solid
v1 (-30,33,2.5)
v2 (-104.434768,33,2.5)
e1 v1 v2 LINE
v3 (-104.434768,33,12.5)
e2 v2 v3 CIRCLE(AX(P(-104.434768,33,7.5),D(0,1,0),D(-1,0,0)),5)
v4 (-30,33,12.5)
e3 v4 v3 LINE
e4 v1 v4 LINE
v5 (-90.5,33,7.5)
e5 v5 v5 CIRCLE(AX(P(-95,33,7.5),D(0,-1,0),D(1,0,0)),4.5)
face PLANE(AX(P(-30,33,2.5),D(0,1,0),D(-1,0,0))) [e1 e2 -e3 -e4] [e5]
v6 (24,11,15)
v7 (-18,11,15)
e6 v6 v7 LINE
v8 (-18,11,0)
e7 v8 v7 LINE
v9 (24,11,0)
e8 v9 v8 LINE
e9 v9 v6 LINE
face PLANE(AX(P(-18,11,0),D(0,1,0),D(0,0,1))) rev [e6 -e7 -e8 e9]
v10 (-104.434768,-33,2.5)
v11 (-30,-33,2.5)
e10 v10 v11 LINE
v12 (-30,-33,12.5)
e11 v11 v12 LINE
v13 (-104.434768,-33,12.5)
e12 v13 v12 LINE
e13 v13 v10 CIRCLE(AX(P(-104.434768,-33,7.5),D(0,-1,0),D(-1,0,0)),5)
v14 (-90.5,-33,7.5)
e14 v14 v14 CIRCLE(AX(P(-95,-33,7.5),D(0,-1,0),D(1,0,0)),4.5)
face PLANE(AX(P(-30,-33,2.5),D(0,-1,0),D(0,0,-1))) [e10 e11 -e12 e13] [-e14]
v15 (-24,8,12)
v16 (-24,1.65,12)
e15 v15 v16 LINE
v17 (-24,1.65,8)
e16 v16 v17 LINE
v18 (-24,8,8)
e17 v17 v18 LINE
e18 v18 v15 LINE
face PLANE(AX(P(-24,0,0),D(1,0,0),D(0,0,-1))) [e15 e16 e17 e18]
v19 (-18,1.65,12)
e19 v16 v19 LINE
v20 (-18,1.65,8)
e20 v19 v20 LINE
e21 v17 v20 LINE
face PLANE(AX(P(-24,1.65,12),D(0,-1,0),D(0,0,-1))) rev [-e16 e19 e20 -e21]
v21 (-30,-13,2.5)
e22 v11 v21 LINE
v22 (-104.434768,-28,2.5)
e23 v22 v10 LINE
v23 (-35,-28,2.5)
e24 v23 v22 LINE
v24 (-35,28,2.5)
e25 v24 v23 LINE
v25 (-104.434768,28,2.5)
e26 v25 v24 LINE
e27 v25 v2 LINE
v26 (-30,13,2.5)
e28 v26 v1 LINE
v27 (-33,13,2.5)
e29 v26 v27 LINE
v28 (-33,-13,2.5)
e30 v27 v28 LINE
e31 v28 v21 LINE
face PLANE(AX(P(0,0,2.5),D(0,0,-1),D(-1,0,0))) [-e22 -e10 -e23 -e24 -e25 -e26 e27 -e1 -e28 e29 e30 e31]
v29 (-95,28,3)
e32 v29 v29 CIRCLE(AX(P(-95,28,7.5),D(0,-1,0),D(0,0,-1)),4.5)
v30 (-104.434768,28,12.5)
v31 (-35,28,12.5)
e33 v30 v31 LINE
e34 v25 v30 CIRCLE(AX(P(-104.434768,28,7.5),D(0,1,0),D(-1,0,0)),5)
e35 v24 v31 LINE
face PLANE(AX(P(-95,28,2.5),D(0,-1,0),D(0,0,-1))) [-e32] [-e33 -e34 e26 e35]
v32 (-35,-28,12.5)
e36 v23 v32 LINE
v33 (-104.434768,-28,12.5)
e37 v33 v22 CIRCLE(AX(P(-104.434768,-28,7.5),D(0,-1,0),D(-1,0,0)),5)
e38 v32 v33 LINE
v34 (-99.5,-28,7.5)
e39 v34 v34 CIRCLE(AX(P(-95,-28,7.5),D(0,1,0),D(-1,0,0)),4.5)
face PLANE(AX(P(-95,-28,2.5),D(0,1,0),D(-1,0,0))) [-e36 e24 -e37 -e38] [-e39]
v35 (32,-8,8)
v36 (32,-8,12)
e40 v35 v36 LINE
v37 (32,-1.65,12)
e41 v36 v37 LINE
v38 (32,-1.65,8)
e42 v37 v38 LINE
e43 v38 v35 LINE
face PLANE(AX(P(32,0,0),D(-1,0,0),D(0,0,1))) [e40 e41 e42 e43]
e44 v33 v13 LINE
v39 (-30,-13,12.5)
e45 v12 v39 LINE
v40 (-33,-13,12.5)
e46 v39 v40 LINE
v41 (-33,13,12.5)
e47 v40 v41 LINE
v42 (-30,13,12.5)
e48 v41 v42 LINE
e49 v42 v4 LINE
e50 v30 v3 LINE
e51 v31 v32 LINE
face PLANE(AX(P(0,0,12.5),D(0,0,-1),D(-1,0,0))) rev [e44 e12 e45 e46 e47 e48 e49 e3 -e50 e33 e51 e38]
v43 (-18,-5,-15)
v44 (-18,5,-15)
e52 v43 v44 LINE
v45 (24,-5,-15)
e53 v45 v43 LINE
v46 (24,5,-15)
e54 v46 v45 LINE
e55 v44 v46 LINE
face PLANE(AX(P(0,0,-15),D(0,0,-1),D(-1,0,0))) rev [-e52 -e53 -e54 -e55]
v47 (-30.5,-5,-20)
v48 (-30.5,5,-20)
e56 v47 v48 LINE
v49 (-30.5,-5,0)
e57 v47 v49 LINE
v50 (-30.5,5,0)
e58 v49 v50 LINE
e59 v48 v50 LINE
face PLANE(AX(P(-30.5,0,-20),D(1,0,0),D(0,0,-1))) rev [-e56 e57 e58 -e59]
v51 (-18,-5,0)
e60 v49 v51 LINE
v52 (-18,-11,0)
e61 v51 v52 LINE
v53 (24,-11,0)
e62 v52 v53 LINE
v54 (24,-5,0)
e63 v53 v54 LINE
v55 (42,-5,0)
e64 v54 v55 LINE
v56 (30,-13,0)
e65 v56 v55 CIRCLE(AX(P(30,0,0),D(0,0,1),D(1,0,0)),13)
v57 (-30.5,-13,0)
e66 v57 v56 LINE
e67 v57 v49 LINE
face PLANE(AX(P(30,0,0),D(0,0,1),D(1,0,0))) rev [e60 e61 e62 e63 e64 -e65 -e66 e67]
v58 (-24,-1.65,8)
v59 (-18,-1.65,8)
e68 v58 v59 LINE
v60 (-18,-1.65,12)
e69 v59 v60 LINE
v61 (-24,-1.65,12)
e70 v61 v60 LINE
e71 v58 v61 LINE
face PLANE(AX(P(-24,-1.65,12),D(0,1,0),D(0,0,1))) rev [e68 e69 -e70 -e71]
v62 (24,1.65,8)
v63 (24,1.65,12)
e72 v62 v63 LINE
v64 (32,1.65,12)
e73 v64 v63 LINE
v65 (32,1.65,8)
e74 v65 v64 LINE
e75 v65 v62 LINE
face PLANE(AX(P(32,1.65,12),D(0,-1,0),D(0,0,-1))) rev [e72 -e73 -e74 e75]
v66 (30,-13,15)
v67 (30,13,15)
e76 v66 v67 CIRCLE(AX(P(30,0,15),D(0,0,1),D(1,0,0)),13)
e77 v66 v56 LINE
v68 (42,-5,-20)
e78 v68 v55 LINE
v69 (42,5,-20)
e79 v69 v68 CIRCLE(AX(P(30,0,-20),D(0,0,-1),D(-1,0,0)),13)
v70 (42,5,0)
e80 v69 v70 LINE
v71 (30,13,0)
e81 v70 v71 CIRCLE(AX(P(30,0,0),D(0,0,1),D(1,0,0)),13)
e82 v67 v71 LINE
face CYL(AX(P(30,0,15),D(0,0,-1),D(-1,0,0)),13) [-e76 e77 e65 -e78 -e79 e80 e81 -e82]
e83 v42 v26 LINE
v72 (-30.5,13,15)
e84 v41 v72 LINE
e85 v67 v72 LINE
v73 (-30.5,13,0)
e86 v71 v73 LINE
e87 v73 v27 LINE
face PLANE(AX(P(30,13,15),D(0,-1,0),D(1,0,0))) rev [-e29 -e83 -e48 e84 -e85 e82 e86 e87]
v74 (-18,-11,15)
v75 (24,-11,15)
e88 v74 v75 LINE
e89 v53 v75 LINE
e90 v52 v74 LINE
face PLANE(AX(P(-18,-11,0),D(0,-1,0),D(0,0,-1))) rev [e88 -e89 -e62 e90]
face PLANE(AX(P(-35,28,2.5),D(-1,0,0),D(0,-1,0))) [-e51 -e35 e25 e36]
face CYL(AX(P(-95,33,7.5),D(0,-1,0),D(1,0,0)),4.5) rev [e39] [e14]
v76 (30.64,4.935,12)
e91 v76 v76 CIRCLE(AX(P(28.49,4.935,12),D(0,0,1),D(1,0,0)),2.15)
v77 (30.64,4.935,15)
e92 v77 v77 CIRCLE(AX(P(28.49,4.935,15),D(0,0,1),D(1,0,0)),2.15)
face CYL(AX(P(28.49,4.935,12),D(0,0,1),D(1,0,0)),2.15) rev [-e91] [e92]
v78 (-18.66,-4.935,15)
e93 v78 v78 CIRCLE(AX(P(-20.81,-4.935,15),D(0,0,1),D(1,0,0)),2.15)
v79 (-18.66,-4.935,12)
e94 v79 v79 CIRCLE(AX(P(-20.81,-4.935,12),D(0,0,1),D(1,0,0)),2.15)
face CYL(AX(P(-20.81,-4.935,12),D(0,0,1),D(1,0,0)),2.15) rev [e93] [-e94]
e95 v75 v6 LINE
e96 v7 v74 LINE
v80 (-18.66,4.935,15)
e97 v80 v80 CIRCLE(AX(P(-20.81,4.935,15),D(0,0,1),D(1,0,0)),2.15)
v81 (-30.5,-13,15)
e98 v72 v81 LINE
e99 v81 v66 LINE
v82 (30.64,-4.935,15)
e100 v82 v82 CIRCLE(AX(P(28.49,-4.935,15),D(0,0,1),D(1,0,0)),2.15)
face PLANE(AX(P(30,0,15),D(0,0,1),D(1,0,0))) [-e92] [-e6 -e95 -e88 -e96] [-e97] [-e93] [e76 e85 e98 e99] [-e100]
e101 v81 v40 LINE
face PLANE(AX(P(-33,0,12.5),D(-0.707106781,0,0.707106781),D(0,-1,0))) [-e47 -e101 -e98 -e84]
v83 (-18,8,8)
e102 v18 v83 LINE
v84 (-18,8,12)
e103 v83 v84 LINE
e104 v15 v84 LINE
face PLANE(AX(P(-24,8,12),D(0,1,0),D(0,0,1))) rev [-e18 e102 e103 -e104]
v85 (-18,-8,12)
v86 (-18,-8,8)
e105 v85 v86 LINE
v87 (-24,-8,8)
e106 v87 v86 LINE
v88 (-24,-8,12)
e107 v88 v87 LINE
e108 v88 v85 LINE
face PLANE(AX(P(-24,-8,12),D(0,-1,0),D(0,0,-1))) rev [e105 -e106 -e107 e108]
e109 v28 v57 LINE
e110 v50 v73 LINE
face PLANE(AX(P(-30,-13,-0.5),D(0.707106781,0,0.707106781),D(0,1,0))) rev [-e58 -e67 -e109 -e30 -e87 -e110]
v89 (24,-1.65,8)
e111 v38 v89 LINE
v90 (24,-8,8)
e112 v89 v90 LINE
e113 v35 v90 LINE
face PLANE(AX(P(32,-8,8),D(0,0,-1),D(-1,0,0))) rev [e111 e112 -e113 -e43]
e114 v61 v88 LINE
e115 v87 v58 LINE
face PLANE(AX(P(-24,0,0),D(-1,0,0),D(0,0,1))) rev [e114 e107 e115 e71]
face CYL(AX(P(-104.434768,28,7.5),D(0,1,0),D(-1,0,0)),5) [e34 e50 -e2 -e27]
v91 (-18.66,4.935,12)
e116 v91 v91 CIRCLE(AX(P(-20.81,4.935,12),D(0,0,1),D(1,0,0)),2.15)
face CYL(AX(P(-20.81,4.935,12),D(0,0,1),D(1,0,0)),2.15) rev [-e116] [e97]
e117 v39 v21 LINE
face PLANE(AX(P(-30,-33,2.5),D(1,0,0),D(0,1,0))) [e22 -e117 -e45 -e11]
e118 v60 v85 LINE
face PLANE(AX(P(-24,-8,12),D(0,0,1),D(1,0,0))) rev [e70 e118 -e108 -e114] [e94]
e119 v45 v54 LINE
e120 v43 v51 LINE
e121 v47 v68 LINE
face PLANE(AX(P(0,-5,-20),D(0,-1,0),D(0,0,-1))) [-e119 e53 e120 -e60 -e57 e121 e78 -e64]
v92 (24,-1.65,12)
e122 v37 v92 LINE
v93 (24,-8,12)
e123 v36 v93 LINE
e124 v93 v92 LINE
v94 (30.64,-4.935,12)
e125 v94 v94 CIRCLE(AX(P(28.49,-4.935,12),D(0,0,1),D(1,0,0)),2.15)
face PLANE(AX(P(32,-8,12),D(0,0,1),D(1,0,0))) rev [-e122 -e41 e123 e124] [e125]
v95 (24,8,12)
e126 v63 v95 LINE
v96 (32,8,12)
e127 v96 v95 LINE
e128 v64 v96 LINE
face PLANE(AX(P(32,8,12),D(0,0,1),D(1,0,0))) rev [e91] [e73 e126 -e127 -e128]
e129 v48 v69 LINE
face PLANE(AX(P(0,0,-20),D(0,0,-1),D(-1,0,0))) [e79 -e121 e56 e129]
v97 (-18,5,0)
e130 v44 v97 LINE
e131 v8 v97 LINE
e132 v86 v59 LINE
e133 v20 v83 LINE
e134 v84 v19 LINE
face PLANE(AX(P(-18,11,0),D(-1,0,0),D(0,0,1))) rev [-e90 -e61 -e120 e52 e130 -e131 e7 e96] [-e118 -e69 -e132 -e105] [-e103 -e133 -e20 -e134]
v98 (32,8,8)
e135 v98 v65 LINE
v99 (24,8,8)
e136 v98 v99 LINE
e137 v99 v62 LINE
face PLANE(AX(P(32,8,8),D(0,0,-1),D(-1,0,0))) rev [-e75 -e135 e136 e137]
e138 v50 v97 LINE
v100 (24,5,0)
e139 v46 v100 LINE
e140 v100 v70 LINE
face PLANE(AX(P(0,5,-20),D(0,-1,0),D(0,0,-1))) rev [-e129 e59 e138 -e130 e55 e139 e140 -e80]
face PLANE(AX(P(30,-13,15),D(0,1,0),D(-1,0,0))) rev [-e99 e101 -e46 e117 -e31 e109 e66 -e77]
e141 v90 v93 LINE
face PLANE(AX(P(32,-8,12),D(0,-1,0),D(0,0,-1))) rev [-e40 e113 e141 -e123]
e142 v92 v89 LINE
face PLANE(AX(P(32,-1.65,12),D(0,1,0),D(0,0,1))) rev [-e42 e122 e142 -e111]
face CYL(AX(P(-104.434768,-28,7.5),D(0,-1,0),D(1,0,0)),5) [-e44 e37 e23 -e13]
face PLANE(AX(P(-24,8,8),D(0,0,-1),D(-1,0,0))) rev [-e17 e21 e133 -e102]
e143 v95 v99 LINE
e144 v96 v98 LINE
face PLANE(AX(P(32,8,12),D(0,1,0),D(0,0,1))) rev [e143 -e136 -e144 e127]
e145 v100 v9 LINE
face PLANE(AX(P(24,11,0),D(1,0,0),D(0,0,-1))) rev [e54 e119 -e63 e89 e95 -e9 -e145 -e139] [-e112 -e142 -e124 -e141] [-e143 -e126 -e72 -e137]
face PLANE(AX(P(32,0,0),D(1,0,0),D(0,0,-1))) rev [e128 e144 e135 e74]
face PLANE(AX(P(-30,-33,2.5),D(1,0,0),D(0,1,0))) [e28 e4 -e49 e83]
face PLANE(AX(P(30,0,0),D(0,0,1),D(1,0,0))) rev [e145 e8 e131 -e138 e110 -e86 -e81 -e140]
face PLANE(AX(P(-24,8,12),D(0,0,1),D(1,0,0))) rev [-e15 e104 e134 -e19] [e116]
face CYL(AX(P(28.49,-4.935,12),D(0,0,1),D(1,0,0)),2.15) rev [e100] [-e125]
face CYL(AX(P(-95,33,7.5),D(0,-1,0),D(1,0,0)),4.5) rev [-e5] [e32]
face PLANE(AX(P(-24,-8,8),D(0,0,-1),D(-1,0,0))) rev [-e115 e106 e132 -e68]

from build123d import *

# Parameters (mm, degrees)
BOSS_EXTRU_1_DEPTH      = 15
ESQUISSE2_W             = 42
ESQUISSE2_H             = 22
ENL_V_MAT_EXTRU_1_DEPTH = 48.360320945
ESQUISSE4_R             = 2.15
ENL_V_MAT_EXTRU_2_DEPTH = 3
ESQUISSE5_W             = 4
ESQUISSE5_H             = 6.35
ENL_V_MAT_EXTRU_3_DEPTH = 6
ESQUISSE6_W             = 4
ESQUISSE6_H             = 6.35
ENL_V_MAT_EXTRU_4_DEPTH = 8
BOSS_EXTRU_2_DEPTH      = 5
BOSS_EXTRU_2_DEPTH_BACK = 5
CHANFREIN1_SIZE         = 3
BOSS_EXTRU_4_DEPTH      = 5
BOSS_EXTRU_6_START      = 20
ESQUISSE13_W            = 12.5
ESQUISSE13_H            = 10
BOSS_EXTRU_6_DEPTH      = 20
ESQUISSE14_W            = 42
ESQUISSE14_H            = 10
BOSS_EXTRU_7_DEPTH      = 5
BOSS_EXTRU_8_START      = -5
BOSS_EXTRU_8_DEPTH      = 5
ESQUISSE17_R            = 4.5
ENL_V_MAT_EXTRU_5_DEPTH = 130.352109985


with BuildPart() as part:
    # Esquisse1 → Boss.-Extru.1 (new body)
    with BuildSketch(Plane.XY):
        with BuildLine():
            Line((30, -13), (-30, -13))
            Line((-30, -13), (-30, 13))
            Line((-30, 13), (30, 13))
            ThreePointArc((30, 13), (43, 0), (30, -13))
        make_face()
    extrude(amount=BOSS_EXTRU_1_DEPTH)

    # Esquisse2 → Enlèv. mat.-Extru.1 (cut, through all)
    with BuildSketch(Plane.XY.offset(15)):
        with Locations((3, 0)):
            Rectangle(ESQUISSE2_W, ESQUISSE2_H)
    extrude(amount=-ENL_V_MAT_EXTRU_1_DEPTH, mode=Mode.SUBTRACT)

    # Esquisse4 → Enlèv. mat.-Extru.2 (cut)
    with BuildSketch(Plane.XY.offset(15)):
        with Locations((-20.81, 4.935)):
            Circle(ESQUISSE4_R)
        with Locations((-20.81, -4.935)):
            Circle(ESQUISSE4_R)
        with Locations((28.49, 4.935)):
            Circle(ESQUISSE4_R)
        with Locations((28.49, -4.935)):
            Circle(ESQUISSE4_R)
    extrude(amount=-ENL_V_MAT_EXTRU_2_DEPTH, mode=Mode.SUBTRACT)

    # Esquisse5 → Enlèv. mat.-Extru.3 (cut)
    with BuildSketch(Plane(origin=(-18, 0, 0), x_dir=(0, 0, -1), z_dir=(1, 0, 0))):
        with Locations((-10, -4.825)):
            Rectangle(ESQUISSE5_W, ESQUISSE5_H)
        with Locations((-10, 4.825)):
            Rectangle(ESQUISSE5_W, ESQUISSE5_H)
    extrude(amount=-ENL_V_MAT_EXTRU_3_DEPTH, mode=Mode.SUBTRACT)

    # Esquisse6 → Enlèv. mat.-Extru.4 (cut)
    with BuildSketch(Plane.ZY.offset(-24)):
        with Locations((10, 4.825)):
            Rectangle(ESQUISSE6_W, ESQUISSE6_H)
        with Locations((10, -4.825)):
            Rectangle(ESQUISSE6_W, ESQUISSE6_H)
    extrude(amount=-ENL_V_MAT_EXTRU_4_DEPTH, mode=Mode.SUBTRACT)

    # Esquisse9 → Boss.-Extru.2 (add, two sides: drawn at the far end of the back side and taken through both)
    with BuildSketch(Plane.XY.offset(7.5).offset(-BOSS_EXTRU_2_DEPTH_BACK)):
        Polygon((-30, -33), (-30, 33), (-95, 33), (-95, 28), (-35, 28), (-35, -28), (-95, -28), (-95, -33), align=None)
    extrude(amount=BOSS_EXTRU_2_DEPTH + BOSS_EXTRU_2_DEPTH_BACK)

    # Chanfrein1
    # the kernel refuses this chamfer: 3 mm, written as the material it adds along each edge
    with BuildSketch(Plane(origin=(-30, -13, 12.5), x_dir=(0.02749587661058678, 0, 0.9996219169112968), z_dir=(0, 1, 0))) as chanfrein1_piece_1_section:
        Polygon((CHANFREIN1_SIZE * 0.999621916911, -CHANFREIN1_SIZE * 0.0274958766106), (-CHANFREIN1_SIZE * 0.0274958766106, -CHANFREIN1_SIZE * 0.999621916911), (0, 0), align=None)
    chanfrein1_piece_1 = extrude(amount=26, mode=Mode.PRIVATE)
    chanfrein1_piece_1 = split(chanfrein1_piece_1, bisect_by=Plane(origin=(-31.023809524, 0, 15), z_dir=(0, 0, -1)), keep=Keep.TOP, mode=Mode.PRIVATE)
    add(chanfrein1_piece_1)
    with BuildSketch(Plane(origin=(-30, -13, 2.5), x_dir=(0.027495876610586778, 0, -0.9996219169112968), z_dir=(0, 1, 0))) as chanfrein1_piece_2_section:
        Polygon((CHANFREIN1_SIZE * 0.999621916911, CHANFREIN1_SIZE * 0.0274958766106), (-CHANFREIN1_SIZE * 0.0274958766106, CHANFREIN1_SIZE * 0.999621916911), (0, 0), align=None)
    chanfrein1_piece_2 = extrude(amount=26, mode=Mode.PRIVATE)
    chanfrein1_piece_2 = split(chanfrein1_piece_2, bisect_by=Plane(origin=(-31.023809524, 0, 0), z_dir=(0, 0, 1)), keep=Keep.TOP, mode=Mode.PRIVATE)
    add(chanfrein1_piece_2)

    # Esquisse11 → Boss.-Extru.4 (add)
    with BuildSketch(Plane.XZ.offset(33)):
        with BuildLine():
            Line((-95, 2.5), (-95, 12.5))
            Line((-95, 12.5), (-104.43476759, 12.5))
            ThreePointArc((-104.43476759, 12.5), (-109.43476759, 7.5), (-104.43476759, 2.5))
            Line((-104.43476759, 2.5), (-95, 2.5))
        make_face()
    extrude(amount=-BOSS_EXTRU_4_DEPTH)

    # Esquisse13 → Boss.-Extru.6 (add)
    with BuildSketch(Plane(origin=(0, 0, 0), x_dir=(-1, 0, 0), z_dir=(0, 0, -1)).offset(BOSS_EXTRU_6_START)):
        with BuildLine():
            Line((-24, -5), (-24, 5))
            Line((-24, 5), (-42, 5))
            ThreePointArc((-42, 5), (-43, 0), (-42, -5))
            Line((-42, -5), (-24, -5))
        make_face()
        with Locations((24.25, 0)):
            Rectangle(ESQUISSE13_W, ESQUISSE13_H)
    extrude(amount=-BOSS_EXTRU_6_DEPTH)

    # Esquisse14 → Boss.-Extru.7 (add)
    with BuildSketch(Plane(origin=(0, 0, -20), x_dir=(-1, 0, 0), z_dir=(0, 0, -1))):
        with Locations((-3, 0)):
            Rectangle(ESQUISSE14_W, ESQUISSE14_H)
    extrude(amount=-BOSS_EXTRU_7_DEPTH)

    # Esquisse16 → Boss.-Extru.8 (add)
    with BuildSketch(Plane(origin=(0, 33, 0), x_dir=(1, 0, 0), z_dir=(0, 1, 0)).offset(BOSS_EXTRU_8_START)):
        with BuildLine():
            Line((-89.416041875, -12.5), (-104.43476759, -12.5))
            ThreePointArc((-104.43476759, -12.5), (-109.43476759, -7.5), (-104.43476759, -2.5))
            Line((-104.43476759, -2.5), (-89.416041875, -2.5))
            Line((-89.416041875, -2.5), (-89.416041875, -12.5))
        make_face()
    extrude(amount=BOSS_EXTRU_8_DEPTH)

    # Esquisse17 → Enlèv. mat.-Extru.5 (cut, through all)
    with BuildSketch(Plane.XZ.offset(33)):
        with Locations((-95, 7.5)):
            Circle(ESQUISSE17_R)
    extrude(amount=-ENL_V_MAT_EXTRU_5_DEPTH, mode=Mode.SUBTRACT)


solid = part.part
